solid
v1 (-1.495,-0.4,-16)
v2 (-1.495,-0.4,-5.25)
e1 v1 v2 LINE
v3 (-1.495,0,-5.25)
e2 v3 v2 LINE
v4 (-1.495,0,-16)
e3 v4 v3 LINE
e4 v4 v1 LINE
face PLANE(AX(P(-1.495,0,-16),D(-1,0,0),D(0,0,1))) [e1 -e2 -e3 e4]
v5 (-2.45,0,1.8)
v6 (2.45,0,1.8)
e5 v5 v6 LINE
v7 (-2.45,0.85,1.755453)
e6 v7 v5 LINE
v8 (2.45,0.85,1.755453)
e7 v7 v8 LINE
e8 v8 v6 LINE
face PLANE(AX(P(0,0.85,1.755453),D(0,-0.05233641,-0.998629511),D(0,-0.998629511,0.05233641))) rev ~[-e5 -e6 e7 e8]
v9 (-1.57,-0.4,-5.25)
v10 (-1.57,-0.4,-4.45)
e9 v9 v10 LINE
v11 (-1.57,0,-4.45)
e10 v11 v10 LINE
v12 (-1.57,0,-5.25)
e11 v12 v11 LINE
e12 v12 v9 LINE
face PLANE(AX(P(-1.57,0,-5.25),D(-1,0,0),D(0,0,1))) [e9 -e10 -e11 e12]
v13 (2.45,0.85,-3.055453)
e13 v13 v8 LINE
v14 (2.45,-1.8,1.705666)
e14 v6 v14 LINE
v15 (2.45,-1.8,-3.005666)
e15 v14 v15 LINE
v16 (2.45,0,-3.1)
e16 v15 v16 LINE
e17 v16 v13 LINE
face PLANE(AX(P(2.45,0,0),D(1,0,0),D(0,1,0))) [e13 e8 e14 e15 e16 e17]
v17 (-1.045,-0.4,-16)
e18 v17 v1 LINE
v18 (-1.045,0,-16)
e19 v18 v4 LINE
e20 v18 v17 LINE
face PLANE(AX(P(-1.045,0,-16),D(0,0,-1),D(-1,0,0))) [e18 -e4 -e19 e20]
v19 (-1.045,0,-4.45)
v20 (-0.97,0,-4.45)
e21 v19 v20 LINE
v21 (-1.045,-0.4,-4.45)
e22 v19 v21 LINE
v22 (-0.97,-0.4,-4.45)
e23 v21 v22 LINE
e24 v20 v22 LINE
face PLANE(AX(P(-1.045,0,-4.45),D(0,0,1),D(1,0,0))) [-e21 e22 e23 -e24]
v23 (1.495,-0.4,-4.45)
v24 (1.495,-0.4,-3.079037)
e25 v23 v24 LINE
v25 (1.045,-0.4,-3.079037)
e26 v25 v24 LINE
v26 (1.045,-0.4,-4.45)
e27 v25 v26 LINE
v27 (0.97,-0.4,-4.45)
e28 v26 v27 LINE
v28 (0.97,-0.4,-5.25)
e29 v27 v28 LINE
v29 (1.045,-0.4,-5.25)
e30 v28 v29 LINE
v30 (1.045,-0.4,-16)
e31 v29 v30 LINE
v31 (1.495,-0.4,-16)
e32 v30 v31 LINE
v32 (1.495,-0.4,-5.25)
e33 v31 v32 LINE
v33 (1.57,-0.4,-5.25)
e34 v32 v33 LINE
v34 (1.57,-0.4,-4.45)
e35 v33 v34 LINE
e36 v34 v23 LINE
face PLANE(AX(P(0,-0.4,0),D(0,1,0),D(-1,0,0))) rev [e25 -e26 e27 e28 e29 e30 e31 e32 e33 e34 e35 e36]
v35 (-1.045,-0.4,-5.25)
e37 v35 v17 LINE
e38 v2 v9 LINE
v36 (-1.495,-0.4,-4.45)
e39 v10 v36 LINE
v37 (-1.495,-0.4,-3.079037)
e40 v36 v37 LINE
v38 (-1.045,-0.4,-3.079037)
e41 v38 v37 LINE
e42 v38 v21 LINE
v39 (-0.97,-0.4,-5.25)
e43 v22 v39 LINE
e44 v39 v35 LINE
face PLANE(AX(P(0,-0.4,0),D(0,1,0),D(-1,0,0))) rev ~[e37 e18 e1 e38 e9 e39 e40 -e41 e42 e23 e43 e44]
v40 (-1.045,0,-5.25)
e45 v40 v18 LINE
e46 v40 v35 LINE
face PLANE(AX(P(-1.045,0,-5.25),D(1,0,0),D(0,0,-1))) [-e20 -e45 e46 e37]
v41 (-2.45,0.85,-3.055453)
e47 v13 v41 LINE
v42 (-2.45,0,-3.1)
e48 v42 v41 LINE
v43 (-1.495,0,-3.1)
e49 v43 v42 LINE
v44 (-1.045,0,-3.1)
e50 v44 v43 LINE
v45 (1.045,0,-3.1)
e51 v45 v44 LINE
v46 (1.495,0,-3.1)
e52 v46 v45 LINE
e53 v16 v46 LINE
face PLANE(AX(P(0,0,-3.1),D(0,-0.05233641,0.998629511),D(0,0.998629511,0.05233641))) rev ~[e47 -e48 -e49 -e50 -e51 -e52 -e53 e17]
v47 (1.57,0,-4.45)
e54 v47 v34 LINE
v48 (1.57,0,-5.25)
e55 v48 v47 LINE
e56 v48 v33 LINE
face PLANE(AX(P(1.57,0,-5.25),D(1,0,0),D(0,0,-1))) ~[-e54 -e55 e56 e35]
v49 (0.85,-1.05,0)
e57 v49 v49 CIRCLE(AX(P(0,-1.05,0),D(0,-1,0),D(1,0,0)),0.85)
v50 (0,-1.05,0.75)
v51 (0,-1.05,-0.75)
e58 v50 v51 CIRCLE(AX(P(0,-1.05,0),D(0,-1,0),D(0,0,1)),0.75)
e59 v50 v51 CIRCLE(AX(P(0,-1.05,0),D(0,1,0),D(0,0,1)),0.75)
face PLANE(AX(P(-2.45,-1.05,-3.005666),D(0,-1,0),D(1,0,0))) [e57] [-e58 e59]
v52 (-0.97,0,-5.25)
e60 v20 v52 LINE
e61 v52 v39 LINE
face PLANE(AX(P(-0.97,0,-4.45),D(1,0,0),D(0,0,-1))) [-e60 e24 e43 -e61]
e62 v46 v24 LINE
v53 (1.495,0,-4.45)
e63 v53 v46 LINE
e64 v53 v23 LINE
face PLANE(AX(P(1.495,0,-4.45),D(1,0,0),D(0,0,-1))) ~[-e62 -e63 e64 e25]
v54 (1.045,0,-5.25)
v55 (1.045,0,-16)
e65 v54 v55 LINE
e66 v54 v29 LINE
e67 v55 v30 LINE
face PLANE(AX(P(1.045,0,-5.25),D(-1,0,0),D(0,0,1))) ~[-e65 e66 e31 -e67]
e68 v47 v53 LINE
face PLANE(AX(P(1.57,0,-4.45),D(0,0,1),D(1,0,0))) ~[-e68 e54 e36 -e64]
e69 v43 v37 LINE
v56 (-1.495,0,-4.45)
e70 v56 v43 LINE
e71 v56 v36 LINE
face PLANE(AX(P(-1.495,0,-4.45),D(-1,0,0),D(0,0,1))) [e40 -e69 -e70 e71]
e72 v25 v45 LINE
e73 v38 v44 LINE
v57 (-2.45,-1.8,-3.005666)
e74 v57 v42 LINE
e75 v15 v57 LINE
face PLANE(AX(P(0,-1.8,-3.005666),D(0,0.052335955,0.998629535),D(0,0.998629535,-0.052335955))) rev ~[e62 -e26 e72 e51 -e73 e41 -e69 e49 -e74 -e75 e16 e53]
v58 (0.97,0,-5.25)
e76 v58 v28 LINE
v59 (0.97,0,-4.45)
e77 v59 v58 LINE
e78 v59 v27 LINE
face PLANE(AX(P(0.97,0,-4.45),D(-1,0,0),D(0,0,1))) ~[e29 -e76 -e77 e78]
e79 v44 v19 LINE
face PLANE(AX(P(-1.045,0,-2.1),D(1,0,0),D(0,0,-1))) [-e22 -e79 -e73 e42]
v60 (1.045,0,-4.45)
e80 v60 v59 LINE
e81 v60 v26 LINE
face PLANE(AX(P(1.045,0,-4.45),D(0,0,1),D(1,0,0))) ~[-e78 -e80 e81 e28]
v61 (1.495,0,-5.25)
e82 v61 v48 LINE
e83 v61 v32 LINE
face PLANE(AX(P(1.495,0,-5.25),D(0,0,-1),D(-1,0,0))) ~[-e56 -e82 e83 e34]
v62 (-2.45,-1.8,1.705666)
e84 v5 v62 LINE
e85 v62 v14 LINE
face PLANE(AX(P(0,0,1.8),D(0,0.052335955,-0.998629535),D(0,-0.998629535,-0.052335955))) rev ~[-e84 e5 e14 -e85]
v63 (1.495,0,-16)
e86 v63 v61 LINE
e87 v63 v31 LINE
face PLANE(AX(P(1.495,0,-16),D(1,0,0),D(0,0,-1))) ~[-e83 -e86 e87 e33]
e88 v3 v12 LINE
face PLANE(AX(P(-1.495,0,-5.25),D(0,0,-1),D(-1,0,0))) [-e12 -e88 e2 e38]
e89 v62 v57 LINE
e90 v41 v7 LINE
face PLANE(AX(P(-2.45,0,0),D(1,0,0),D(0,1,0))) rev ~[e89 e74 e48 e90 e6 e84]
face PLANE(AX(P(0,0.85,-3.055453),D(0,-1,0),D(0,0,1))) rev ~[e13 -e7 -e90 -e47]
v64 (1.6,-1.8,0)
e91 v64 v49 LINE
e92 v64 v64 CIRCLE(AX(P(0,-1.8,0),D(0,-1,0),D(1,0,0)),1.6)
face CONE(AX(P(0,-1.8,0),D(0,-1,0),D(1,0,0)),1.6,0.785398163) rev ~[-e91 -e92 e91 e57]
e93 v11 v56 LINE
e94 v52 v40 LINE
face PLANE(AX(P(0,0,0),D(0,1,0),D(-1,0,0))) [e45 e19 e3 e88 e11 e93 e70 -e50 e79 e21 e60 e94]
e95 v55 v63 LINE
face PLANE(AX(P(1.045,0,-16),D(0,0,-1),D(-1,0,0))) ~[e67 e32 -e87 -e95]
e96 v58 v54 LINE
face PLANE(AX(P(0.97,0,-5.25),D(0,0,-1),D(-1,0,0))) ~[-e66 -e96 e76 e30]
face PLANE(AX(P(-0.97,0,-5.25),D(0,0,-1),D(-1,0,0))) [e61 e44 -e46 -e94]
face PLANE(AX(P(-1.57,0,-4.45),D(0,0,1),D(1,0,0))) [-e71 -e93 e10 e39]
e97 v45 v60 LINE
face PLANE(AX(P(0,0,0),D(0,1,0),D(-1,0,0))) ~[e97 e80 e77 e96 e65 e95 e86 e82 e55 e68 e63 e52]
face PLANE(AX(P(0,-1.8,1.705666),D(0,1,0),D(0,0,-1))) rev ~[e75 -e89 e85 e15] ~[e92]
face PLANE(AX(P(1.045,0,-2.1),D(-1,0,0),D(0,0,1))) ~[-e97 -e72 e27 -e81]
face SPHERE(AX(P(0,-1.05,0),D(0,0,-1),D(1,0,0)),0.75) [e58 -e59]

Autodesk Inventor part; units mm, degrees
ref_plane "YZ Plane" through (0, 0, 0) normal (1, 0, 0) x (0, 1, 0)
ref_plane "XZ Plane" through (0, 0, 0) normal (0, 1, 0) x (-1, 0, 0)
ref_plane "XY Plane" through (0, 0, 0) normal (0, 0, 1) x (1, 0, 0)
sketch "Skizze1" plane through (0, 0, 0) normal (1, 0, 0) x (0, 1, 0)
  line L0 (0.85, 1.755453) -> (0, 1.8)
  line L1 (0, 1.8) -> (-1.8, 1.705666)
  line L2 (-1.8, 1.705666) -> (-1.8, -3.005666)
  line L3 (-1.8, -3.005666) -> (0, -3.1)
  line L4 (0, -3.1) -> (0.85, -3.055453)
  line L5 (0.85, -3.055453) -> (0.85, 1.755453)
  line L6 (0, 2.78) -> (0, -4.08)
  line L7 (-2.33, 0) -> (1.38, 0)
  point P0 (0, 0)
  dimension "d0" = 2.65
  dimension "d1" = 4.9
  dimension "d2" = 3.1
  dimension "d3" = 3
  dimension "d4" = 3
  dimension "d5" = 3
  dimension "d6" = 3
  dimension "d7" = 1.8
sketch "Skizze1 outline for Extrusion1" plane through (0, 0, 0) normal (1, 0, 0) x (0, 1, 0)
  line L0 (0.85, 1.755453) -> (0, 1.8)
  line L1 (0, 1.8) -> (-1.8, 1.705666)
  line L2 (-1.8, 1.705666) -> (-1.8, -3.005666)
  line L3 (-1.8, -3.005666) -> (0, -3.1)
  line L4 (0, -3.1) -> (0.85, -3.055453)
  line L5 (0.85, -3.055453) -> (0.85, 1.755453)
extrude "Extrusion1" add sketch "Skizze1 outline for Extrusion1" along normal mid plane 4.9
sketch "Skizze2" plane through (0, 0, 0) normal (0, 1, 0) x (-1, 0, 0)
  line L0 (2.45, -3.1) -> (-2.45, -3.1)
  line L1 (1.495, -2.1) -> (1.045, -2.1)
  line L2 (1.045, -16) -> (1.495, -16)
  line L3 (0.97, -4.45) -> (0.97, -5.25)
  line L4 (1.57, -5.25) -> (1.57, -4.45)
  line L5 (1.57, -4.45) -> (1.495, -4.45)
  line L6 (1.045, -4.45) -> (0.97, -4.45)
  line L7 (1.495, -16) -> (1.495, -5.25)
  line L8 (1.495, -4.45) -> (1.495, -2.1)
  line L9 (1.045, -2.1) -> (1.045, -4.45)
  line L10 (1.045, -5.25) -> (1.045, -16)
  line L11 (0.97, -5.25) -> (1.045, -5.25)
  line L12 (1.495, -5.25) -> (1.57, -5.25)
  line L13 (1.27, -16) -> (1.27, -2.1) construction
  line L14 (2.45, 1.8) -> (-2.45, 1.8) construction
  line L15 (-2.45, 1.755453) -> (-2.45, 1.8) construction
  line L16 (2.45, 1.755453) -> (-2.45, 1.755453) construction
  line L17 (2.45, 1.8) -> (2.45, 1.755453) construction
  point P0 (0, 0)
  dimension "d10" = 0.45
  dimension "d11" = 0.6
  dimension "d12" = 0.8
  dimension "d13" = 2.15
  dimension "d14" = 1.27
  dimension "d15" = 17.8
  dimension "d16" = 1
sketch "Skizze2 outline for Extrusion2" plane through (0, 0, 0) normal (0, 1, 0) x (-1, 0, 0)
  line L0 (1.495, -4.45) -> (1.495, -2.1)
  line L1 (1.57, -4.45) -> (1.495, -4.45)
  line L2 (1.57, -5.25) -> (1.57, -4.45)
  line L3 (1.495, -5.25) -> (1.57, -5.25)
  line L4 (1.495, -16) -> (1.495, -5.25)
  line L5 (1.045, -16) -> (1.495, -16)
  line L6 (1.045, -5.25) -> (1.045, -16)
  line L7 (0.97, -5.25) -> (1.045, -5.25)
  line L8 (0.97, -4.45) -> (0.97, -5.25)
  line L9 (1.045, -4.45) -> (0.97, -4.45)
  line L10 (1.045, -2.1) -> (1.045, -4.45)
  line L11 (1.495, -2.1) -> (1.045, -2.1)
extrude "Extrusion2" add sketch "Skizze2 outline for Extrusion2" against normal blind 0.4
mirror "Spiegeln1" about plane through (0, 0, 0) normal (1, 0, 0) of "Extrusion2"
sketch "Skizze3" plane through (-2.45, -1.8, -3.005666) normal (0, -1, 0) x (1, 0, 0)
  line L0 (2.45, 5.785666) -> (2.45, -1.074334)
  line L1 (-0.98, 3.005666) -> (5.88, 3.005666)
  circle A0 centre (2.45, 3.005666) radius 1.6
  dimension "d19" = 3.2
sketch "Skizze3 outline for Extrusion3" plane through (-2.45, -1.8, -3.005666) normal (0, -1, 0) x (1, 0, 0)
  circle A0 centre (2.45, 3.005666) radius 1.6
extrude "Extrusion3" cut sketch "Skizze3 outline for Extrusion3" against normal blind 0.75 draft -45
sketch "Skizze4" plane through (0, 0, 0) normal (1, 0, 0) x (0, 1, 0)
  line L0 (-1.05, 0.85) -> (-1.05, -0.85)
  arc A0 (-1.05, 0.75) -> (-1.05, -0.75) centre (-1.05, 0) ccw
  line L1 (-2.371105, 0) -> (1.386851, 0)
  line L2 (-1.05, 0.75) -> (-1.05, -0.75)
  point P0 (0, 0)
  dimension "d22" = 0.75
sketch "Skizze4 outline for Umdrehung1" plane through (0, 0, 0) normal (1, 0, 0) x (0, 1, 0)
  line L0 (-1.05, -0.75) -> (-1.05, 0.75)
  arc A0 (-1.05, 0.75) -> (-1.05, -0.75) centre (-1.05, 0) ccw
revolve "Umdrehung1" add sketch "Skizze4 outline for Umdrehung1" angle 180 mid plane about axis through (0, -1.05, 0.75) along (0, 0, -1)
properties part number "IR Emitter TSKS5400S"
